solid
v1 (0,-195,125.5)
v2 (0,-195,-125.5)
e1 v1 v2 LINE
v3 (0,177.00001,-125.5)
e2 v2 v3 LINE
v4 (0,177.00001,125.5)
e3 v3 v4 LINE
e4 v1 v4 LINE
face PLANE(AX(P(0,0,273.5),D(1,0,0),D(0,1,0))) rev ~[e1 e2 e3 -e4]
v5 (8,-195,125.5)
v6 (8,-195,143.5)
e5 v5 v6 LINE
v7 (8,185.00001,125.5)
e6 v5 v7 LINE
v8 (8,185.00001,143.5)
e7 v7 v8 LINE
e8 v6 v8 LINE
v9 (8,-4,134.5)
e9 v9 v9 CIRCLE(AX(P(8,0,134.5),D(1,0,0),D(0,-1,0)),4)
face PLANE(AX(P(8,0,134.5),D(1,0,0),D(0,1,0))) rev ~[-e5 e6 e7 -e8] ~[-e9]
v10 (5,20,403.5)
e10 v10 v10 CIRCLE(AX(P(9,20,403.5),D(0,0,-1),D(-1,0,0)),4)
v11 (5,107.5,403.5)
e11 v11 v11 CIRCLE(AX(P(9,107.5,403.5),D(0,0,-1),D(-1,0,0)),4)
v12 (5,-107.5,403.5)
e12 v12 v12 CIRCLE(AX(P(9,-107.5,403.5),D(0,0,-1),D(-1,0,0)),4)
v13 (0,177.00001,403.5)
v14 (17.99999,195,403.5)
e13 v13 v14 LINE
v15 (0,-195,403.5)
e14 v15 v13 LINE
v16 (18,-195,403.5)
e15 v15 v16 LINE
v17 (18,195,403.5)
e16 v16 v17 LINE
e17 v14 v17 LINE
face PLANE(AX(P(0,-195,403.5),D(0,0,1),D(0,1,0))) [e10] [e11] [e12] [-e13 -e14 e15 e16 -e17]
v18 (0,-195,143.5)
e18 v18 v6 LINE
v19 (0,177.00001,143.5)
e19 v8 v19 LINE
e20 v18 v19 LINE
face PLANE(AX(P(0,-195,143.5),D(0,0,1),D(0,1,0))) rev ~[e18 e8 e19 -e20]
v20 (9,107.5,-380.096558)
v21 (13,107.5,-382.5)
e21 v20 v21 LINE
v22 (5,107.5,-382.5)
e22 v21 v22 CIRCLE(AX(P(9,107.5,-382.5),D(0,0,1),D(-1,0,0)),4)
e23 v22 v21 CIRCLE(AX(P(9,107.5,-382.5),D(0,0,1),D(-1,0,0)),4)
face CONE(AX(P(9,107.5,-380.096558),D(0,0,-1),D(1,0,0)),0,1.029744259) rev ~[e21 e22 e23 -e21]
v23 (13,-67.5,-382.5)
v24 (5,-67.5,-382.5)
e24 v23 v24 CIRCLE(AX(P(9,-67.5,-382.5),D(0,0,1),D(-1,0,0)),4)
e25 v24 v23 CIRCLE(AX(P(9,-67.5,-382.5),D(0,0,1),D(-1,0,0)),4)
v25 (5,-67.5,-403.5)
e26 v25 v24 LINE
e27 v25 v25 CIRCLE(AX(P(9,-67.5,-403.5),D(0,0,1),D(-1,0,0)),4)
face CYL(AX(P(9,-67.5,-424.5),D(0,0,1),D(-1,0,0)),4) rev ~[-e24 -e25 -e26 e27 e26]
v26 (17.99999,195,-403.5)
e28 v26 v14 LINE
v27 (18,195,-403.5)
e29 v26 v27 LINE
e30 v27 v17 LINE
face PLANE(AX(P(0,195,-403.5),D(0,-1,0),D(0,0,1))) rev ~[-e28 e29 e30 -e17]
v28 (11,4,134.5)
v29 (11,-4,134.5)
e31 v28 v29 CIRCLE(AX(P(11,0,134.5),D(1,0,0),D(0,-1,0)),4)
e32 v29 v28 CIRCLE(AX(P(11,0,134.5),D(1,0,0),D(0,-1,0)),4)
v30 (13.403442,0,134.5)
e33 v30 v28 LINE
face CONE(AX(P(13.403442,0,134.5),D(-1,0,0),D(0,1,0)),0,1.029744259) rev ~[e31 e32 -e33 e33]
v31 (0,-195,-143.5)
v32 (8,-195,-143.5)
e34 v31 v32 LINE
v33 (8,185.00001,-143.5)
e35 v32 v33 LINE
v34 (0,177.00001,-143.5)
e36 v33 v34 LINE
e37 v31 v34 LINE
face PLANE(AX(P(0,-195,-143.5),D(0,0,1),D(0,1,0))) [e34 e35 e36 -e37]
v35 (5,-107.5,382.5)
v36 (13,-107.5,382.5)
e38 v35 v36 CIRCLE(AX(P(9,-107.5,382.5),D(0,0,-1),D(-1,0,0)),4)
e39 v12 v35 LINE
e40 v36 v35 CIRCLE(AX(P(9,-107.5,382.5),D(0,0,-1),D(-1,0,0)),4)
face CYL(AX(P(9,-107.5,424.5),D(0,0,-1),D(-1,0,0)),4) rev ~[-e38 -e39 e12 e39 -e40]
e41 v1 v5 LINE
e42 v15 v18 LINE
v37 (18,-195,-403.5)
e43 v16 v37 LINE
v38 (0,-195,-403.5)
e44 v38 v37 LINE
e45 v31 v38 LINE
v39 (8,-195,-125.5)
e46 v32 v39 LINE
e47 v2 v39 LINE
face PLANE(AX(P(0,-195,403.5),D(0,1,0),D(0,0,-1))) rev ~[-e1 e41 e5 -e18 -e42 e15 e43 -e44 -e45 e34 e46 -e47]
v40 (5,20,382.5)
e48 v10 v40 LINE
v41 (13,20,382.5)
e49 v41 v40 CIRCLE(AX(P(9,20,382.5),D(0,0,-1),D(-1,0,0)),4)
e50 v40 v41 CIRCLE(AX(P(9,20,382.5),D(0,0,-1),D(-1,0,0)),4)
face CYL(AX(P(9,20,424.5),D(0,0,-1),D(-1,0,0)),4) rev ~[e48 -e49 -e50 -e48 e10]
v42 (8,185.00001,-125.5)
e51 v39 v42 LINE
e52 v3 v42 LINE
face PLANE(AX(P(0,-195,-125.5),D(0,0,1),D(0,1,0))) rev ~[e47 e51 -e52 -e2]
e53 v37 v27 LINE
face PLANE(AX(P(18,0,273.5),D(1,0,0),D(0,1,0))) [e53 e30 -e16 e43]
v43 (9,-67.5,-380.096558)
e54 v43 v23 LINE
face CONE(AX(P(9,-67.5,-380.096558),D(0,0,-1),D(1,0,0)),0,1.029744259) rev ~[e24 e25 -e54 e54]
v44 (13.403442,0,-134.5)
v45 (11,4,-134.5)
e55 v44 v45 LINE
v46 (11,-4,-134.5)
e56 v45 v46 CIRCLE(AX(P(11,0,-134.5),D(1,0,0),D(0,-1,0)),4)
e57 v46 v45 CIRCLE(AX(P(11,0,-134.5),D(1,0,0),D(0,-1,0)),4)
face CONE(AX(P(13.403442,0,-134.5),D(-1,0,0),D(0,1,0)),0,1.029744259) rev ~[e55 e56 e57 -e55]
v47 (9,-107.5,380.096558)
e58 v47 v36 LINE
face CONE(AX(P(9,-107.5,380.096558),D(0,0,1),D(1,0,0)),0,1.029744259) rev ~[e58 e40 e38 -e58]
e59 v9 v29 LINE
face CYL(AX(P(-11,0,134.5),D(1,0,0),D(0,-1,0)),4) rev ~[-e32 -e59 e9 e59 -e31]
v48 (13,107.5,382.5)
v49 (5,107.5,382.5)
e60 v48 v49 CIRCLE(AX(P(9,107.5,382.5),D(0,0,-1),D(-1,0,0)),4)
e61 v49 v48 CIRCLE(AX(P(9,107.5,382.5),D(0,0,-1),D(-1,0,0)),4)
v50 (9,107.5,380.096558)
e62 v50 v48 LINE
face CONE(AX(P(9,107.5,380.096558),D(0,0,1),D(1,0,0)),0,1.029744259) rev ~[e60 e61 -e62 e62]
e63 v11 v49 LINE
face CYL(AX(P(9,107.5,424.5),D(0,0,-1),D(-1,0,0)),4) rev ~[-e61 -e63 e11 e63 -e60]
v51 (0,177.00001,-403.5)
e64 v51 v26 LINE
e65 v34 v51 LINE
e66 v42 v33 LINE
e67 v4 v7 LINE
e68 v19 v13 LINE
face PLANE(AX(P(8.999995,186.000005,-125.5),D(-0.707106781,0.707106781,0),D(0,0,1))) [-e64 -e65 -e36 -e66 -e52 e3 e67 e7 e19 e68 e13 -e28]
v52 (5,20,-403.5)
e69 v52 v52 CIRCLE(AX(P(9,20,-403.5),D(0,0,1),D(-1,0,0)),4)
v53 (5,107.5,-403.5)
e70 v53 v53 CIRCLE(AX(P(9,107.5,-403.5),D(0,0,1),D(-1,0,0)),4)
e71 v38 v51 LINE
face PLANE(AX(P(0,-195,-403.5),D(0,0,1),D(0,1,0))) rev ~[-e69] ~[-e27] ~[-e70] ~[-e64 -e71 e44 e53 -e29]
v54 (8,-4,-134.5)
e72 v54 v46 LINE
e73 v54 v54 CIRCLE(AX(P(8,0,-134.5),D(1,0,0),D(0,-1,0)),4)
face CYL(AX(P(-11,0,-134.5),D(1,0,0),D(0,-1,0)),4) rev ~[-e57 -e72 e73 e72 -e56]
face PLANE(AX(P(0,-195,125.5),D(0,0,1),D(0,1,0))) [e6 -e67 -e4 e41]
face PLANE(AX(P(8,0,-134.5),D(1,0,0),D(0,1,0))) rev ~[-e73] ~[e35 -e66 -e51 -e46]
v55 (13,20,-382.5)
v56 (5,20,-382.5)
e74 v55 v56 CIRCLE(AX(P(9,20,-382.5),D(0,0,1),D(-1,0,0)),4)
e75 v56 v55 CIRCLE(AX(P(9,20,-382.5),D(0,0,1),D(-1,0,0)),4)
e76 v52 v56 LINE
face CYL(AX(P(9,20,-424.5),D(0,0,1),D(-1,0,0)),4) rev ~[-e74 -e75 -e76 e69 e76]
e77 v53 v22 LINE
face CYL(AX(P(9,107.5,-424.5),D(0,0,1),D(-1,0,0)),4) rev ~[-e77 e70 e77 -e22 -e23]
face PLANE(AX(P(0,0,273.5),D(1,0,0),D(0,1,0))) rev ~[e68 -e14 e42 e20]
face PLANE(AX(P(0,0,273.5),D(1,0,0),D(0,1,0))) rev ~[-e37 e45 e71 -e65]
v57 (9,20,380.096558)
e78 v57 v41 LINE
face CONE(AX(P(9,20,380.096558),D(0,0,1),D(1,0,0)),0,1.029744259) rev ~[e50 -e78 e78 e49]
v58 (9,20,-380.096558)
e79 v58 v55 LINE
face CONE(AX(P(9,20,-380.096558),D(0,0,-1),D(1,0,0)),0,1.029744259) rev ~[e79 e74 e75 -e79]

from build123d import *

# Parameters (mm, degrees)
F0_W           = 390
F0_H           = 260
F0_H_2         = 251
F0_H_3         = 18
F1_DEPTH       = 18
F2_DEPTH       = 8
F3_SIZE2       = 17.99999
F3_SIZE        = 17.99999
F6_D           = 8
F6_DEPTH       = 21
F6_TIP         = 2.4034424761
F6_ON_F5_D     = 8
F6_ON_F5_DEPTH = 21
F6_ON_F5_TIP   = 2.4034424761
F8_D           = 8
F8_DEPTH       = 11
F8_TIP         = 2.4034424761


# Not quite as in the source:
# - a fillet or chamfer is up to 0.001 mm smaller than in the source, because OpenCascade refuses the exact size


with BuildPart() as f1:
    # F0 (on Right) → F1 (new body)
    with BuildSketch(Plane.YZ):
        with Locations((0, 273.5)):
            Rectangle(F0_W, F0_H)
        Rectangle(F0_W, F0_H_2)
        with Locations((0, -273.5)):
            Rectangle(F0_W, F0_H)
        with Locations((0, 134.5)):
            Rectangle(F0_W, F0_H_3)
        with Locations((0, -134.5)):
            Rectangle(F0_W, F0_H_3)
    extrude(amount=F1_DEPTH)

    # F0 (on Right) → F2 (cut)
    with BuildSketch(Plane.YZ):
        with Locations((0, 134.5)):
            Rectangle(F0_W, F0_H_3)
        with Locations((0, -134.5)):
            Rectangle(F0_W, F0_H_3)
    extrude(amount=F2_DEPTH, mode=Mode.SUBTRACT)

    # F3 (size 18 and 18 in the source; OpenCascade refuses exactly that, so slightly less here)
    f3_edges = [f1.edges().sort_by_distance(p)[0] for p in [
        (0, 195, 0),
    ]]
    chamfer(f3_edges, length=F3_SIZE, length2=F3_SIZE2)

    # F6
    with Locations(Plane.XY.offset(403.5)):
        with Locations((9, 107.5), (9, 20), (9, -107.5)):
            Hole(F6_D / 2, depth=F6_DEPTH)
            with Locations((0, 0, -(F6_DEPTH + F6_TIP / 2))):  # 118° drill point
                Cone(0, F6_D / 2, F6_TIP, mode=Mode.SUBTRACT)

    # F6 on F5
    with Locations(Plane(origin=(0, 0, -403.5), x_dir=(1, 0, 0), z_dir=(0, 0, -1))):
        with Locations((9, -107.5), (9, -20), (9, 67.5)):
            Hole(F6_ON_F5_D / 2, depth=F6_ON_F5_DEPTH)
            with Locations((0, 0, -(F6_ON_F5_DEPTH + F6_ON_F5_TIP / 2))):  # 118° drill point
                Cone(0, F6_ON_F5_D / 2, F6_ON_F5_TIP, mode=Mode.SUBTRACT)

    # F8
    with Locations(Plane(origin=(0, 0, 0), x_dir=(0, 1, 0), z_dir=(-1, 0, 0))):
        with Locations((0, 134.5), (0, -134.5)):
            Hole(F8_D / 2, depth=F8_DEPTH)
            with Locations((0, 0, -(F8_DEPTH + F8_TIP / 2))):  # 118° drill point
                Cone(0, F8_D / 2, F8_TIP, mode=Mode.SUBTRACT)


solid = f1.part
